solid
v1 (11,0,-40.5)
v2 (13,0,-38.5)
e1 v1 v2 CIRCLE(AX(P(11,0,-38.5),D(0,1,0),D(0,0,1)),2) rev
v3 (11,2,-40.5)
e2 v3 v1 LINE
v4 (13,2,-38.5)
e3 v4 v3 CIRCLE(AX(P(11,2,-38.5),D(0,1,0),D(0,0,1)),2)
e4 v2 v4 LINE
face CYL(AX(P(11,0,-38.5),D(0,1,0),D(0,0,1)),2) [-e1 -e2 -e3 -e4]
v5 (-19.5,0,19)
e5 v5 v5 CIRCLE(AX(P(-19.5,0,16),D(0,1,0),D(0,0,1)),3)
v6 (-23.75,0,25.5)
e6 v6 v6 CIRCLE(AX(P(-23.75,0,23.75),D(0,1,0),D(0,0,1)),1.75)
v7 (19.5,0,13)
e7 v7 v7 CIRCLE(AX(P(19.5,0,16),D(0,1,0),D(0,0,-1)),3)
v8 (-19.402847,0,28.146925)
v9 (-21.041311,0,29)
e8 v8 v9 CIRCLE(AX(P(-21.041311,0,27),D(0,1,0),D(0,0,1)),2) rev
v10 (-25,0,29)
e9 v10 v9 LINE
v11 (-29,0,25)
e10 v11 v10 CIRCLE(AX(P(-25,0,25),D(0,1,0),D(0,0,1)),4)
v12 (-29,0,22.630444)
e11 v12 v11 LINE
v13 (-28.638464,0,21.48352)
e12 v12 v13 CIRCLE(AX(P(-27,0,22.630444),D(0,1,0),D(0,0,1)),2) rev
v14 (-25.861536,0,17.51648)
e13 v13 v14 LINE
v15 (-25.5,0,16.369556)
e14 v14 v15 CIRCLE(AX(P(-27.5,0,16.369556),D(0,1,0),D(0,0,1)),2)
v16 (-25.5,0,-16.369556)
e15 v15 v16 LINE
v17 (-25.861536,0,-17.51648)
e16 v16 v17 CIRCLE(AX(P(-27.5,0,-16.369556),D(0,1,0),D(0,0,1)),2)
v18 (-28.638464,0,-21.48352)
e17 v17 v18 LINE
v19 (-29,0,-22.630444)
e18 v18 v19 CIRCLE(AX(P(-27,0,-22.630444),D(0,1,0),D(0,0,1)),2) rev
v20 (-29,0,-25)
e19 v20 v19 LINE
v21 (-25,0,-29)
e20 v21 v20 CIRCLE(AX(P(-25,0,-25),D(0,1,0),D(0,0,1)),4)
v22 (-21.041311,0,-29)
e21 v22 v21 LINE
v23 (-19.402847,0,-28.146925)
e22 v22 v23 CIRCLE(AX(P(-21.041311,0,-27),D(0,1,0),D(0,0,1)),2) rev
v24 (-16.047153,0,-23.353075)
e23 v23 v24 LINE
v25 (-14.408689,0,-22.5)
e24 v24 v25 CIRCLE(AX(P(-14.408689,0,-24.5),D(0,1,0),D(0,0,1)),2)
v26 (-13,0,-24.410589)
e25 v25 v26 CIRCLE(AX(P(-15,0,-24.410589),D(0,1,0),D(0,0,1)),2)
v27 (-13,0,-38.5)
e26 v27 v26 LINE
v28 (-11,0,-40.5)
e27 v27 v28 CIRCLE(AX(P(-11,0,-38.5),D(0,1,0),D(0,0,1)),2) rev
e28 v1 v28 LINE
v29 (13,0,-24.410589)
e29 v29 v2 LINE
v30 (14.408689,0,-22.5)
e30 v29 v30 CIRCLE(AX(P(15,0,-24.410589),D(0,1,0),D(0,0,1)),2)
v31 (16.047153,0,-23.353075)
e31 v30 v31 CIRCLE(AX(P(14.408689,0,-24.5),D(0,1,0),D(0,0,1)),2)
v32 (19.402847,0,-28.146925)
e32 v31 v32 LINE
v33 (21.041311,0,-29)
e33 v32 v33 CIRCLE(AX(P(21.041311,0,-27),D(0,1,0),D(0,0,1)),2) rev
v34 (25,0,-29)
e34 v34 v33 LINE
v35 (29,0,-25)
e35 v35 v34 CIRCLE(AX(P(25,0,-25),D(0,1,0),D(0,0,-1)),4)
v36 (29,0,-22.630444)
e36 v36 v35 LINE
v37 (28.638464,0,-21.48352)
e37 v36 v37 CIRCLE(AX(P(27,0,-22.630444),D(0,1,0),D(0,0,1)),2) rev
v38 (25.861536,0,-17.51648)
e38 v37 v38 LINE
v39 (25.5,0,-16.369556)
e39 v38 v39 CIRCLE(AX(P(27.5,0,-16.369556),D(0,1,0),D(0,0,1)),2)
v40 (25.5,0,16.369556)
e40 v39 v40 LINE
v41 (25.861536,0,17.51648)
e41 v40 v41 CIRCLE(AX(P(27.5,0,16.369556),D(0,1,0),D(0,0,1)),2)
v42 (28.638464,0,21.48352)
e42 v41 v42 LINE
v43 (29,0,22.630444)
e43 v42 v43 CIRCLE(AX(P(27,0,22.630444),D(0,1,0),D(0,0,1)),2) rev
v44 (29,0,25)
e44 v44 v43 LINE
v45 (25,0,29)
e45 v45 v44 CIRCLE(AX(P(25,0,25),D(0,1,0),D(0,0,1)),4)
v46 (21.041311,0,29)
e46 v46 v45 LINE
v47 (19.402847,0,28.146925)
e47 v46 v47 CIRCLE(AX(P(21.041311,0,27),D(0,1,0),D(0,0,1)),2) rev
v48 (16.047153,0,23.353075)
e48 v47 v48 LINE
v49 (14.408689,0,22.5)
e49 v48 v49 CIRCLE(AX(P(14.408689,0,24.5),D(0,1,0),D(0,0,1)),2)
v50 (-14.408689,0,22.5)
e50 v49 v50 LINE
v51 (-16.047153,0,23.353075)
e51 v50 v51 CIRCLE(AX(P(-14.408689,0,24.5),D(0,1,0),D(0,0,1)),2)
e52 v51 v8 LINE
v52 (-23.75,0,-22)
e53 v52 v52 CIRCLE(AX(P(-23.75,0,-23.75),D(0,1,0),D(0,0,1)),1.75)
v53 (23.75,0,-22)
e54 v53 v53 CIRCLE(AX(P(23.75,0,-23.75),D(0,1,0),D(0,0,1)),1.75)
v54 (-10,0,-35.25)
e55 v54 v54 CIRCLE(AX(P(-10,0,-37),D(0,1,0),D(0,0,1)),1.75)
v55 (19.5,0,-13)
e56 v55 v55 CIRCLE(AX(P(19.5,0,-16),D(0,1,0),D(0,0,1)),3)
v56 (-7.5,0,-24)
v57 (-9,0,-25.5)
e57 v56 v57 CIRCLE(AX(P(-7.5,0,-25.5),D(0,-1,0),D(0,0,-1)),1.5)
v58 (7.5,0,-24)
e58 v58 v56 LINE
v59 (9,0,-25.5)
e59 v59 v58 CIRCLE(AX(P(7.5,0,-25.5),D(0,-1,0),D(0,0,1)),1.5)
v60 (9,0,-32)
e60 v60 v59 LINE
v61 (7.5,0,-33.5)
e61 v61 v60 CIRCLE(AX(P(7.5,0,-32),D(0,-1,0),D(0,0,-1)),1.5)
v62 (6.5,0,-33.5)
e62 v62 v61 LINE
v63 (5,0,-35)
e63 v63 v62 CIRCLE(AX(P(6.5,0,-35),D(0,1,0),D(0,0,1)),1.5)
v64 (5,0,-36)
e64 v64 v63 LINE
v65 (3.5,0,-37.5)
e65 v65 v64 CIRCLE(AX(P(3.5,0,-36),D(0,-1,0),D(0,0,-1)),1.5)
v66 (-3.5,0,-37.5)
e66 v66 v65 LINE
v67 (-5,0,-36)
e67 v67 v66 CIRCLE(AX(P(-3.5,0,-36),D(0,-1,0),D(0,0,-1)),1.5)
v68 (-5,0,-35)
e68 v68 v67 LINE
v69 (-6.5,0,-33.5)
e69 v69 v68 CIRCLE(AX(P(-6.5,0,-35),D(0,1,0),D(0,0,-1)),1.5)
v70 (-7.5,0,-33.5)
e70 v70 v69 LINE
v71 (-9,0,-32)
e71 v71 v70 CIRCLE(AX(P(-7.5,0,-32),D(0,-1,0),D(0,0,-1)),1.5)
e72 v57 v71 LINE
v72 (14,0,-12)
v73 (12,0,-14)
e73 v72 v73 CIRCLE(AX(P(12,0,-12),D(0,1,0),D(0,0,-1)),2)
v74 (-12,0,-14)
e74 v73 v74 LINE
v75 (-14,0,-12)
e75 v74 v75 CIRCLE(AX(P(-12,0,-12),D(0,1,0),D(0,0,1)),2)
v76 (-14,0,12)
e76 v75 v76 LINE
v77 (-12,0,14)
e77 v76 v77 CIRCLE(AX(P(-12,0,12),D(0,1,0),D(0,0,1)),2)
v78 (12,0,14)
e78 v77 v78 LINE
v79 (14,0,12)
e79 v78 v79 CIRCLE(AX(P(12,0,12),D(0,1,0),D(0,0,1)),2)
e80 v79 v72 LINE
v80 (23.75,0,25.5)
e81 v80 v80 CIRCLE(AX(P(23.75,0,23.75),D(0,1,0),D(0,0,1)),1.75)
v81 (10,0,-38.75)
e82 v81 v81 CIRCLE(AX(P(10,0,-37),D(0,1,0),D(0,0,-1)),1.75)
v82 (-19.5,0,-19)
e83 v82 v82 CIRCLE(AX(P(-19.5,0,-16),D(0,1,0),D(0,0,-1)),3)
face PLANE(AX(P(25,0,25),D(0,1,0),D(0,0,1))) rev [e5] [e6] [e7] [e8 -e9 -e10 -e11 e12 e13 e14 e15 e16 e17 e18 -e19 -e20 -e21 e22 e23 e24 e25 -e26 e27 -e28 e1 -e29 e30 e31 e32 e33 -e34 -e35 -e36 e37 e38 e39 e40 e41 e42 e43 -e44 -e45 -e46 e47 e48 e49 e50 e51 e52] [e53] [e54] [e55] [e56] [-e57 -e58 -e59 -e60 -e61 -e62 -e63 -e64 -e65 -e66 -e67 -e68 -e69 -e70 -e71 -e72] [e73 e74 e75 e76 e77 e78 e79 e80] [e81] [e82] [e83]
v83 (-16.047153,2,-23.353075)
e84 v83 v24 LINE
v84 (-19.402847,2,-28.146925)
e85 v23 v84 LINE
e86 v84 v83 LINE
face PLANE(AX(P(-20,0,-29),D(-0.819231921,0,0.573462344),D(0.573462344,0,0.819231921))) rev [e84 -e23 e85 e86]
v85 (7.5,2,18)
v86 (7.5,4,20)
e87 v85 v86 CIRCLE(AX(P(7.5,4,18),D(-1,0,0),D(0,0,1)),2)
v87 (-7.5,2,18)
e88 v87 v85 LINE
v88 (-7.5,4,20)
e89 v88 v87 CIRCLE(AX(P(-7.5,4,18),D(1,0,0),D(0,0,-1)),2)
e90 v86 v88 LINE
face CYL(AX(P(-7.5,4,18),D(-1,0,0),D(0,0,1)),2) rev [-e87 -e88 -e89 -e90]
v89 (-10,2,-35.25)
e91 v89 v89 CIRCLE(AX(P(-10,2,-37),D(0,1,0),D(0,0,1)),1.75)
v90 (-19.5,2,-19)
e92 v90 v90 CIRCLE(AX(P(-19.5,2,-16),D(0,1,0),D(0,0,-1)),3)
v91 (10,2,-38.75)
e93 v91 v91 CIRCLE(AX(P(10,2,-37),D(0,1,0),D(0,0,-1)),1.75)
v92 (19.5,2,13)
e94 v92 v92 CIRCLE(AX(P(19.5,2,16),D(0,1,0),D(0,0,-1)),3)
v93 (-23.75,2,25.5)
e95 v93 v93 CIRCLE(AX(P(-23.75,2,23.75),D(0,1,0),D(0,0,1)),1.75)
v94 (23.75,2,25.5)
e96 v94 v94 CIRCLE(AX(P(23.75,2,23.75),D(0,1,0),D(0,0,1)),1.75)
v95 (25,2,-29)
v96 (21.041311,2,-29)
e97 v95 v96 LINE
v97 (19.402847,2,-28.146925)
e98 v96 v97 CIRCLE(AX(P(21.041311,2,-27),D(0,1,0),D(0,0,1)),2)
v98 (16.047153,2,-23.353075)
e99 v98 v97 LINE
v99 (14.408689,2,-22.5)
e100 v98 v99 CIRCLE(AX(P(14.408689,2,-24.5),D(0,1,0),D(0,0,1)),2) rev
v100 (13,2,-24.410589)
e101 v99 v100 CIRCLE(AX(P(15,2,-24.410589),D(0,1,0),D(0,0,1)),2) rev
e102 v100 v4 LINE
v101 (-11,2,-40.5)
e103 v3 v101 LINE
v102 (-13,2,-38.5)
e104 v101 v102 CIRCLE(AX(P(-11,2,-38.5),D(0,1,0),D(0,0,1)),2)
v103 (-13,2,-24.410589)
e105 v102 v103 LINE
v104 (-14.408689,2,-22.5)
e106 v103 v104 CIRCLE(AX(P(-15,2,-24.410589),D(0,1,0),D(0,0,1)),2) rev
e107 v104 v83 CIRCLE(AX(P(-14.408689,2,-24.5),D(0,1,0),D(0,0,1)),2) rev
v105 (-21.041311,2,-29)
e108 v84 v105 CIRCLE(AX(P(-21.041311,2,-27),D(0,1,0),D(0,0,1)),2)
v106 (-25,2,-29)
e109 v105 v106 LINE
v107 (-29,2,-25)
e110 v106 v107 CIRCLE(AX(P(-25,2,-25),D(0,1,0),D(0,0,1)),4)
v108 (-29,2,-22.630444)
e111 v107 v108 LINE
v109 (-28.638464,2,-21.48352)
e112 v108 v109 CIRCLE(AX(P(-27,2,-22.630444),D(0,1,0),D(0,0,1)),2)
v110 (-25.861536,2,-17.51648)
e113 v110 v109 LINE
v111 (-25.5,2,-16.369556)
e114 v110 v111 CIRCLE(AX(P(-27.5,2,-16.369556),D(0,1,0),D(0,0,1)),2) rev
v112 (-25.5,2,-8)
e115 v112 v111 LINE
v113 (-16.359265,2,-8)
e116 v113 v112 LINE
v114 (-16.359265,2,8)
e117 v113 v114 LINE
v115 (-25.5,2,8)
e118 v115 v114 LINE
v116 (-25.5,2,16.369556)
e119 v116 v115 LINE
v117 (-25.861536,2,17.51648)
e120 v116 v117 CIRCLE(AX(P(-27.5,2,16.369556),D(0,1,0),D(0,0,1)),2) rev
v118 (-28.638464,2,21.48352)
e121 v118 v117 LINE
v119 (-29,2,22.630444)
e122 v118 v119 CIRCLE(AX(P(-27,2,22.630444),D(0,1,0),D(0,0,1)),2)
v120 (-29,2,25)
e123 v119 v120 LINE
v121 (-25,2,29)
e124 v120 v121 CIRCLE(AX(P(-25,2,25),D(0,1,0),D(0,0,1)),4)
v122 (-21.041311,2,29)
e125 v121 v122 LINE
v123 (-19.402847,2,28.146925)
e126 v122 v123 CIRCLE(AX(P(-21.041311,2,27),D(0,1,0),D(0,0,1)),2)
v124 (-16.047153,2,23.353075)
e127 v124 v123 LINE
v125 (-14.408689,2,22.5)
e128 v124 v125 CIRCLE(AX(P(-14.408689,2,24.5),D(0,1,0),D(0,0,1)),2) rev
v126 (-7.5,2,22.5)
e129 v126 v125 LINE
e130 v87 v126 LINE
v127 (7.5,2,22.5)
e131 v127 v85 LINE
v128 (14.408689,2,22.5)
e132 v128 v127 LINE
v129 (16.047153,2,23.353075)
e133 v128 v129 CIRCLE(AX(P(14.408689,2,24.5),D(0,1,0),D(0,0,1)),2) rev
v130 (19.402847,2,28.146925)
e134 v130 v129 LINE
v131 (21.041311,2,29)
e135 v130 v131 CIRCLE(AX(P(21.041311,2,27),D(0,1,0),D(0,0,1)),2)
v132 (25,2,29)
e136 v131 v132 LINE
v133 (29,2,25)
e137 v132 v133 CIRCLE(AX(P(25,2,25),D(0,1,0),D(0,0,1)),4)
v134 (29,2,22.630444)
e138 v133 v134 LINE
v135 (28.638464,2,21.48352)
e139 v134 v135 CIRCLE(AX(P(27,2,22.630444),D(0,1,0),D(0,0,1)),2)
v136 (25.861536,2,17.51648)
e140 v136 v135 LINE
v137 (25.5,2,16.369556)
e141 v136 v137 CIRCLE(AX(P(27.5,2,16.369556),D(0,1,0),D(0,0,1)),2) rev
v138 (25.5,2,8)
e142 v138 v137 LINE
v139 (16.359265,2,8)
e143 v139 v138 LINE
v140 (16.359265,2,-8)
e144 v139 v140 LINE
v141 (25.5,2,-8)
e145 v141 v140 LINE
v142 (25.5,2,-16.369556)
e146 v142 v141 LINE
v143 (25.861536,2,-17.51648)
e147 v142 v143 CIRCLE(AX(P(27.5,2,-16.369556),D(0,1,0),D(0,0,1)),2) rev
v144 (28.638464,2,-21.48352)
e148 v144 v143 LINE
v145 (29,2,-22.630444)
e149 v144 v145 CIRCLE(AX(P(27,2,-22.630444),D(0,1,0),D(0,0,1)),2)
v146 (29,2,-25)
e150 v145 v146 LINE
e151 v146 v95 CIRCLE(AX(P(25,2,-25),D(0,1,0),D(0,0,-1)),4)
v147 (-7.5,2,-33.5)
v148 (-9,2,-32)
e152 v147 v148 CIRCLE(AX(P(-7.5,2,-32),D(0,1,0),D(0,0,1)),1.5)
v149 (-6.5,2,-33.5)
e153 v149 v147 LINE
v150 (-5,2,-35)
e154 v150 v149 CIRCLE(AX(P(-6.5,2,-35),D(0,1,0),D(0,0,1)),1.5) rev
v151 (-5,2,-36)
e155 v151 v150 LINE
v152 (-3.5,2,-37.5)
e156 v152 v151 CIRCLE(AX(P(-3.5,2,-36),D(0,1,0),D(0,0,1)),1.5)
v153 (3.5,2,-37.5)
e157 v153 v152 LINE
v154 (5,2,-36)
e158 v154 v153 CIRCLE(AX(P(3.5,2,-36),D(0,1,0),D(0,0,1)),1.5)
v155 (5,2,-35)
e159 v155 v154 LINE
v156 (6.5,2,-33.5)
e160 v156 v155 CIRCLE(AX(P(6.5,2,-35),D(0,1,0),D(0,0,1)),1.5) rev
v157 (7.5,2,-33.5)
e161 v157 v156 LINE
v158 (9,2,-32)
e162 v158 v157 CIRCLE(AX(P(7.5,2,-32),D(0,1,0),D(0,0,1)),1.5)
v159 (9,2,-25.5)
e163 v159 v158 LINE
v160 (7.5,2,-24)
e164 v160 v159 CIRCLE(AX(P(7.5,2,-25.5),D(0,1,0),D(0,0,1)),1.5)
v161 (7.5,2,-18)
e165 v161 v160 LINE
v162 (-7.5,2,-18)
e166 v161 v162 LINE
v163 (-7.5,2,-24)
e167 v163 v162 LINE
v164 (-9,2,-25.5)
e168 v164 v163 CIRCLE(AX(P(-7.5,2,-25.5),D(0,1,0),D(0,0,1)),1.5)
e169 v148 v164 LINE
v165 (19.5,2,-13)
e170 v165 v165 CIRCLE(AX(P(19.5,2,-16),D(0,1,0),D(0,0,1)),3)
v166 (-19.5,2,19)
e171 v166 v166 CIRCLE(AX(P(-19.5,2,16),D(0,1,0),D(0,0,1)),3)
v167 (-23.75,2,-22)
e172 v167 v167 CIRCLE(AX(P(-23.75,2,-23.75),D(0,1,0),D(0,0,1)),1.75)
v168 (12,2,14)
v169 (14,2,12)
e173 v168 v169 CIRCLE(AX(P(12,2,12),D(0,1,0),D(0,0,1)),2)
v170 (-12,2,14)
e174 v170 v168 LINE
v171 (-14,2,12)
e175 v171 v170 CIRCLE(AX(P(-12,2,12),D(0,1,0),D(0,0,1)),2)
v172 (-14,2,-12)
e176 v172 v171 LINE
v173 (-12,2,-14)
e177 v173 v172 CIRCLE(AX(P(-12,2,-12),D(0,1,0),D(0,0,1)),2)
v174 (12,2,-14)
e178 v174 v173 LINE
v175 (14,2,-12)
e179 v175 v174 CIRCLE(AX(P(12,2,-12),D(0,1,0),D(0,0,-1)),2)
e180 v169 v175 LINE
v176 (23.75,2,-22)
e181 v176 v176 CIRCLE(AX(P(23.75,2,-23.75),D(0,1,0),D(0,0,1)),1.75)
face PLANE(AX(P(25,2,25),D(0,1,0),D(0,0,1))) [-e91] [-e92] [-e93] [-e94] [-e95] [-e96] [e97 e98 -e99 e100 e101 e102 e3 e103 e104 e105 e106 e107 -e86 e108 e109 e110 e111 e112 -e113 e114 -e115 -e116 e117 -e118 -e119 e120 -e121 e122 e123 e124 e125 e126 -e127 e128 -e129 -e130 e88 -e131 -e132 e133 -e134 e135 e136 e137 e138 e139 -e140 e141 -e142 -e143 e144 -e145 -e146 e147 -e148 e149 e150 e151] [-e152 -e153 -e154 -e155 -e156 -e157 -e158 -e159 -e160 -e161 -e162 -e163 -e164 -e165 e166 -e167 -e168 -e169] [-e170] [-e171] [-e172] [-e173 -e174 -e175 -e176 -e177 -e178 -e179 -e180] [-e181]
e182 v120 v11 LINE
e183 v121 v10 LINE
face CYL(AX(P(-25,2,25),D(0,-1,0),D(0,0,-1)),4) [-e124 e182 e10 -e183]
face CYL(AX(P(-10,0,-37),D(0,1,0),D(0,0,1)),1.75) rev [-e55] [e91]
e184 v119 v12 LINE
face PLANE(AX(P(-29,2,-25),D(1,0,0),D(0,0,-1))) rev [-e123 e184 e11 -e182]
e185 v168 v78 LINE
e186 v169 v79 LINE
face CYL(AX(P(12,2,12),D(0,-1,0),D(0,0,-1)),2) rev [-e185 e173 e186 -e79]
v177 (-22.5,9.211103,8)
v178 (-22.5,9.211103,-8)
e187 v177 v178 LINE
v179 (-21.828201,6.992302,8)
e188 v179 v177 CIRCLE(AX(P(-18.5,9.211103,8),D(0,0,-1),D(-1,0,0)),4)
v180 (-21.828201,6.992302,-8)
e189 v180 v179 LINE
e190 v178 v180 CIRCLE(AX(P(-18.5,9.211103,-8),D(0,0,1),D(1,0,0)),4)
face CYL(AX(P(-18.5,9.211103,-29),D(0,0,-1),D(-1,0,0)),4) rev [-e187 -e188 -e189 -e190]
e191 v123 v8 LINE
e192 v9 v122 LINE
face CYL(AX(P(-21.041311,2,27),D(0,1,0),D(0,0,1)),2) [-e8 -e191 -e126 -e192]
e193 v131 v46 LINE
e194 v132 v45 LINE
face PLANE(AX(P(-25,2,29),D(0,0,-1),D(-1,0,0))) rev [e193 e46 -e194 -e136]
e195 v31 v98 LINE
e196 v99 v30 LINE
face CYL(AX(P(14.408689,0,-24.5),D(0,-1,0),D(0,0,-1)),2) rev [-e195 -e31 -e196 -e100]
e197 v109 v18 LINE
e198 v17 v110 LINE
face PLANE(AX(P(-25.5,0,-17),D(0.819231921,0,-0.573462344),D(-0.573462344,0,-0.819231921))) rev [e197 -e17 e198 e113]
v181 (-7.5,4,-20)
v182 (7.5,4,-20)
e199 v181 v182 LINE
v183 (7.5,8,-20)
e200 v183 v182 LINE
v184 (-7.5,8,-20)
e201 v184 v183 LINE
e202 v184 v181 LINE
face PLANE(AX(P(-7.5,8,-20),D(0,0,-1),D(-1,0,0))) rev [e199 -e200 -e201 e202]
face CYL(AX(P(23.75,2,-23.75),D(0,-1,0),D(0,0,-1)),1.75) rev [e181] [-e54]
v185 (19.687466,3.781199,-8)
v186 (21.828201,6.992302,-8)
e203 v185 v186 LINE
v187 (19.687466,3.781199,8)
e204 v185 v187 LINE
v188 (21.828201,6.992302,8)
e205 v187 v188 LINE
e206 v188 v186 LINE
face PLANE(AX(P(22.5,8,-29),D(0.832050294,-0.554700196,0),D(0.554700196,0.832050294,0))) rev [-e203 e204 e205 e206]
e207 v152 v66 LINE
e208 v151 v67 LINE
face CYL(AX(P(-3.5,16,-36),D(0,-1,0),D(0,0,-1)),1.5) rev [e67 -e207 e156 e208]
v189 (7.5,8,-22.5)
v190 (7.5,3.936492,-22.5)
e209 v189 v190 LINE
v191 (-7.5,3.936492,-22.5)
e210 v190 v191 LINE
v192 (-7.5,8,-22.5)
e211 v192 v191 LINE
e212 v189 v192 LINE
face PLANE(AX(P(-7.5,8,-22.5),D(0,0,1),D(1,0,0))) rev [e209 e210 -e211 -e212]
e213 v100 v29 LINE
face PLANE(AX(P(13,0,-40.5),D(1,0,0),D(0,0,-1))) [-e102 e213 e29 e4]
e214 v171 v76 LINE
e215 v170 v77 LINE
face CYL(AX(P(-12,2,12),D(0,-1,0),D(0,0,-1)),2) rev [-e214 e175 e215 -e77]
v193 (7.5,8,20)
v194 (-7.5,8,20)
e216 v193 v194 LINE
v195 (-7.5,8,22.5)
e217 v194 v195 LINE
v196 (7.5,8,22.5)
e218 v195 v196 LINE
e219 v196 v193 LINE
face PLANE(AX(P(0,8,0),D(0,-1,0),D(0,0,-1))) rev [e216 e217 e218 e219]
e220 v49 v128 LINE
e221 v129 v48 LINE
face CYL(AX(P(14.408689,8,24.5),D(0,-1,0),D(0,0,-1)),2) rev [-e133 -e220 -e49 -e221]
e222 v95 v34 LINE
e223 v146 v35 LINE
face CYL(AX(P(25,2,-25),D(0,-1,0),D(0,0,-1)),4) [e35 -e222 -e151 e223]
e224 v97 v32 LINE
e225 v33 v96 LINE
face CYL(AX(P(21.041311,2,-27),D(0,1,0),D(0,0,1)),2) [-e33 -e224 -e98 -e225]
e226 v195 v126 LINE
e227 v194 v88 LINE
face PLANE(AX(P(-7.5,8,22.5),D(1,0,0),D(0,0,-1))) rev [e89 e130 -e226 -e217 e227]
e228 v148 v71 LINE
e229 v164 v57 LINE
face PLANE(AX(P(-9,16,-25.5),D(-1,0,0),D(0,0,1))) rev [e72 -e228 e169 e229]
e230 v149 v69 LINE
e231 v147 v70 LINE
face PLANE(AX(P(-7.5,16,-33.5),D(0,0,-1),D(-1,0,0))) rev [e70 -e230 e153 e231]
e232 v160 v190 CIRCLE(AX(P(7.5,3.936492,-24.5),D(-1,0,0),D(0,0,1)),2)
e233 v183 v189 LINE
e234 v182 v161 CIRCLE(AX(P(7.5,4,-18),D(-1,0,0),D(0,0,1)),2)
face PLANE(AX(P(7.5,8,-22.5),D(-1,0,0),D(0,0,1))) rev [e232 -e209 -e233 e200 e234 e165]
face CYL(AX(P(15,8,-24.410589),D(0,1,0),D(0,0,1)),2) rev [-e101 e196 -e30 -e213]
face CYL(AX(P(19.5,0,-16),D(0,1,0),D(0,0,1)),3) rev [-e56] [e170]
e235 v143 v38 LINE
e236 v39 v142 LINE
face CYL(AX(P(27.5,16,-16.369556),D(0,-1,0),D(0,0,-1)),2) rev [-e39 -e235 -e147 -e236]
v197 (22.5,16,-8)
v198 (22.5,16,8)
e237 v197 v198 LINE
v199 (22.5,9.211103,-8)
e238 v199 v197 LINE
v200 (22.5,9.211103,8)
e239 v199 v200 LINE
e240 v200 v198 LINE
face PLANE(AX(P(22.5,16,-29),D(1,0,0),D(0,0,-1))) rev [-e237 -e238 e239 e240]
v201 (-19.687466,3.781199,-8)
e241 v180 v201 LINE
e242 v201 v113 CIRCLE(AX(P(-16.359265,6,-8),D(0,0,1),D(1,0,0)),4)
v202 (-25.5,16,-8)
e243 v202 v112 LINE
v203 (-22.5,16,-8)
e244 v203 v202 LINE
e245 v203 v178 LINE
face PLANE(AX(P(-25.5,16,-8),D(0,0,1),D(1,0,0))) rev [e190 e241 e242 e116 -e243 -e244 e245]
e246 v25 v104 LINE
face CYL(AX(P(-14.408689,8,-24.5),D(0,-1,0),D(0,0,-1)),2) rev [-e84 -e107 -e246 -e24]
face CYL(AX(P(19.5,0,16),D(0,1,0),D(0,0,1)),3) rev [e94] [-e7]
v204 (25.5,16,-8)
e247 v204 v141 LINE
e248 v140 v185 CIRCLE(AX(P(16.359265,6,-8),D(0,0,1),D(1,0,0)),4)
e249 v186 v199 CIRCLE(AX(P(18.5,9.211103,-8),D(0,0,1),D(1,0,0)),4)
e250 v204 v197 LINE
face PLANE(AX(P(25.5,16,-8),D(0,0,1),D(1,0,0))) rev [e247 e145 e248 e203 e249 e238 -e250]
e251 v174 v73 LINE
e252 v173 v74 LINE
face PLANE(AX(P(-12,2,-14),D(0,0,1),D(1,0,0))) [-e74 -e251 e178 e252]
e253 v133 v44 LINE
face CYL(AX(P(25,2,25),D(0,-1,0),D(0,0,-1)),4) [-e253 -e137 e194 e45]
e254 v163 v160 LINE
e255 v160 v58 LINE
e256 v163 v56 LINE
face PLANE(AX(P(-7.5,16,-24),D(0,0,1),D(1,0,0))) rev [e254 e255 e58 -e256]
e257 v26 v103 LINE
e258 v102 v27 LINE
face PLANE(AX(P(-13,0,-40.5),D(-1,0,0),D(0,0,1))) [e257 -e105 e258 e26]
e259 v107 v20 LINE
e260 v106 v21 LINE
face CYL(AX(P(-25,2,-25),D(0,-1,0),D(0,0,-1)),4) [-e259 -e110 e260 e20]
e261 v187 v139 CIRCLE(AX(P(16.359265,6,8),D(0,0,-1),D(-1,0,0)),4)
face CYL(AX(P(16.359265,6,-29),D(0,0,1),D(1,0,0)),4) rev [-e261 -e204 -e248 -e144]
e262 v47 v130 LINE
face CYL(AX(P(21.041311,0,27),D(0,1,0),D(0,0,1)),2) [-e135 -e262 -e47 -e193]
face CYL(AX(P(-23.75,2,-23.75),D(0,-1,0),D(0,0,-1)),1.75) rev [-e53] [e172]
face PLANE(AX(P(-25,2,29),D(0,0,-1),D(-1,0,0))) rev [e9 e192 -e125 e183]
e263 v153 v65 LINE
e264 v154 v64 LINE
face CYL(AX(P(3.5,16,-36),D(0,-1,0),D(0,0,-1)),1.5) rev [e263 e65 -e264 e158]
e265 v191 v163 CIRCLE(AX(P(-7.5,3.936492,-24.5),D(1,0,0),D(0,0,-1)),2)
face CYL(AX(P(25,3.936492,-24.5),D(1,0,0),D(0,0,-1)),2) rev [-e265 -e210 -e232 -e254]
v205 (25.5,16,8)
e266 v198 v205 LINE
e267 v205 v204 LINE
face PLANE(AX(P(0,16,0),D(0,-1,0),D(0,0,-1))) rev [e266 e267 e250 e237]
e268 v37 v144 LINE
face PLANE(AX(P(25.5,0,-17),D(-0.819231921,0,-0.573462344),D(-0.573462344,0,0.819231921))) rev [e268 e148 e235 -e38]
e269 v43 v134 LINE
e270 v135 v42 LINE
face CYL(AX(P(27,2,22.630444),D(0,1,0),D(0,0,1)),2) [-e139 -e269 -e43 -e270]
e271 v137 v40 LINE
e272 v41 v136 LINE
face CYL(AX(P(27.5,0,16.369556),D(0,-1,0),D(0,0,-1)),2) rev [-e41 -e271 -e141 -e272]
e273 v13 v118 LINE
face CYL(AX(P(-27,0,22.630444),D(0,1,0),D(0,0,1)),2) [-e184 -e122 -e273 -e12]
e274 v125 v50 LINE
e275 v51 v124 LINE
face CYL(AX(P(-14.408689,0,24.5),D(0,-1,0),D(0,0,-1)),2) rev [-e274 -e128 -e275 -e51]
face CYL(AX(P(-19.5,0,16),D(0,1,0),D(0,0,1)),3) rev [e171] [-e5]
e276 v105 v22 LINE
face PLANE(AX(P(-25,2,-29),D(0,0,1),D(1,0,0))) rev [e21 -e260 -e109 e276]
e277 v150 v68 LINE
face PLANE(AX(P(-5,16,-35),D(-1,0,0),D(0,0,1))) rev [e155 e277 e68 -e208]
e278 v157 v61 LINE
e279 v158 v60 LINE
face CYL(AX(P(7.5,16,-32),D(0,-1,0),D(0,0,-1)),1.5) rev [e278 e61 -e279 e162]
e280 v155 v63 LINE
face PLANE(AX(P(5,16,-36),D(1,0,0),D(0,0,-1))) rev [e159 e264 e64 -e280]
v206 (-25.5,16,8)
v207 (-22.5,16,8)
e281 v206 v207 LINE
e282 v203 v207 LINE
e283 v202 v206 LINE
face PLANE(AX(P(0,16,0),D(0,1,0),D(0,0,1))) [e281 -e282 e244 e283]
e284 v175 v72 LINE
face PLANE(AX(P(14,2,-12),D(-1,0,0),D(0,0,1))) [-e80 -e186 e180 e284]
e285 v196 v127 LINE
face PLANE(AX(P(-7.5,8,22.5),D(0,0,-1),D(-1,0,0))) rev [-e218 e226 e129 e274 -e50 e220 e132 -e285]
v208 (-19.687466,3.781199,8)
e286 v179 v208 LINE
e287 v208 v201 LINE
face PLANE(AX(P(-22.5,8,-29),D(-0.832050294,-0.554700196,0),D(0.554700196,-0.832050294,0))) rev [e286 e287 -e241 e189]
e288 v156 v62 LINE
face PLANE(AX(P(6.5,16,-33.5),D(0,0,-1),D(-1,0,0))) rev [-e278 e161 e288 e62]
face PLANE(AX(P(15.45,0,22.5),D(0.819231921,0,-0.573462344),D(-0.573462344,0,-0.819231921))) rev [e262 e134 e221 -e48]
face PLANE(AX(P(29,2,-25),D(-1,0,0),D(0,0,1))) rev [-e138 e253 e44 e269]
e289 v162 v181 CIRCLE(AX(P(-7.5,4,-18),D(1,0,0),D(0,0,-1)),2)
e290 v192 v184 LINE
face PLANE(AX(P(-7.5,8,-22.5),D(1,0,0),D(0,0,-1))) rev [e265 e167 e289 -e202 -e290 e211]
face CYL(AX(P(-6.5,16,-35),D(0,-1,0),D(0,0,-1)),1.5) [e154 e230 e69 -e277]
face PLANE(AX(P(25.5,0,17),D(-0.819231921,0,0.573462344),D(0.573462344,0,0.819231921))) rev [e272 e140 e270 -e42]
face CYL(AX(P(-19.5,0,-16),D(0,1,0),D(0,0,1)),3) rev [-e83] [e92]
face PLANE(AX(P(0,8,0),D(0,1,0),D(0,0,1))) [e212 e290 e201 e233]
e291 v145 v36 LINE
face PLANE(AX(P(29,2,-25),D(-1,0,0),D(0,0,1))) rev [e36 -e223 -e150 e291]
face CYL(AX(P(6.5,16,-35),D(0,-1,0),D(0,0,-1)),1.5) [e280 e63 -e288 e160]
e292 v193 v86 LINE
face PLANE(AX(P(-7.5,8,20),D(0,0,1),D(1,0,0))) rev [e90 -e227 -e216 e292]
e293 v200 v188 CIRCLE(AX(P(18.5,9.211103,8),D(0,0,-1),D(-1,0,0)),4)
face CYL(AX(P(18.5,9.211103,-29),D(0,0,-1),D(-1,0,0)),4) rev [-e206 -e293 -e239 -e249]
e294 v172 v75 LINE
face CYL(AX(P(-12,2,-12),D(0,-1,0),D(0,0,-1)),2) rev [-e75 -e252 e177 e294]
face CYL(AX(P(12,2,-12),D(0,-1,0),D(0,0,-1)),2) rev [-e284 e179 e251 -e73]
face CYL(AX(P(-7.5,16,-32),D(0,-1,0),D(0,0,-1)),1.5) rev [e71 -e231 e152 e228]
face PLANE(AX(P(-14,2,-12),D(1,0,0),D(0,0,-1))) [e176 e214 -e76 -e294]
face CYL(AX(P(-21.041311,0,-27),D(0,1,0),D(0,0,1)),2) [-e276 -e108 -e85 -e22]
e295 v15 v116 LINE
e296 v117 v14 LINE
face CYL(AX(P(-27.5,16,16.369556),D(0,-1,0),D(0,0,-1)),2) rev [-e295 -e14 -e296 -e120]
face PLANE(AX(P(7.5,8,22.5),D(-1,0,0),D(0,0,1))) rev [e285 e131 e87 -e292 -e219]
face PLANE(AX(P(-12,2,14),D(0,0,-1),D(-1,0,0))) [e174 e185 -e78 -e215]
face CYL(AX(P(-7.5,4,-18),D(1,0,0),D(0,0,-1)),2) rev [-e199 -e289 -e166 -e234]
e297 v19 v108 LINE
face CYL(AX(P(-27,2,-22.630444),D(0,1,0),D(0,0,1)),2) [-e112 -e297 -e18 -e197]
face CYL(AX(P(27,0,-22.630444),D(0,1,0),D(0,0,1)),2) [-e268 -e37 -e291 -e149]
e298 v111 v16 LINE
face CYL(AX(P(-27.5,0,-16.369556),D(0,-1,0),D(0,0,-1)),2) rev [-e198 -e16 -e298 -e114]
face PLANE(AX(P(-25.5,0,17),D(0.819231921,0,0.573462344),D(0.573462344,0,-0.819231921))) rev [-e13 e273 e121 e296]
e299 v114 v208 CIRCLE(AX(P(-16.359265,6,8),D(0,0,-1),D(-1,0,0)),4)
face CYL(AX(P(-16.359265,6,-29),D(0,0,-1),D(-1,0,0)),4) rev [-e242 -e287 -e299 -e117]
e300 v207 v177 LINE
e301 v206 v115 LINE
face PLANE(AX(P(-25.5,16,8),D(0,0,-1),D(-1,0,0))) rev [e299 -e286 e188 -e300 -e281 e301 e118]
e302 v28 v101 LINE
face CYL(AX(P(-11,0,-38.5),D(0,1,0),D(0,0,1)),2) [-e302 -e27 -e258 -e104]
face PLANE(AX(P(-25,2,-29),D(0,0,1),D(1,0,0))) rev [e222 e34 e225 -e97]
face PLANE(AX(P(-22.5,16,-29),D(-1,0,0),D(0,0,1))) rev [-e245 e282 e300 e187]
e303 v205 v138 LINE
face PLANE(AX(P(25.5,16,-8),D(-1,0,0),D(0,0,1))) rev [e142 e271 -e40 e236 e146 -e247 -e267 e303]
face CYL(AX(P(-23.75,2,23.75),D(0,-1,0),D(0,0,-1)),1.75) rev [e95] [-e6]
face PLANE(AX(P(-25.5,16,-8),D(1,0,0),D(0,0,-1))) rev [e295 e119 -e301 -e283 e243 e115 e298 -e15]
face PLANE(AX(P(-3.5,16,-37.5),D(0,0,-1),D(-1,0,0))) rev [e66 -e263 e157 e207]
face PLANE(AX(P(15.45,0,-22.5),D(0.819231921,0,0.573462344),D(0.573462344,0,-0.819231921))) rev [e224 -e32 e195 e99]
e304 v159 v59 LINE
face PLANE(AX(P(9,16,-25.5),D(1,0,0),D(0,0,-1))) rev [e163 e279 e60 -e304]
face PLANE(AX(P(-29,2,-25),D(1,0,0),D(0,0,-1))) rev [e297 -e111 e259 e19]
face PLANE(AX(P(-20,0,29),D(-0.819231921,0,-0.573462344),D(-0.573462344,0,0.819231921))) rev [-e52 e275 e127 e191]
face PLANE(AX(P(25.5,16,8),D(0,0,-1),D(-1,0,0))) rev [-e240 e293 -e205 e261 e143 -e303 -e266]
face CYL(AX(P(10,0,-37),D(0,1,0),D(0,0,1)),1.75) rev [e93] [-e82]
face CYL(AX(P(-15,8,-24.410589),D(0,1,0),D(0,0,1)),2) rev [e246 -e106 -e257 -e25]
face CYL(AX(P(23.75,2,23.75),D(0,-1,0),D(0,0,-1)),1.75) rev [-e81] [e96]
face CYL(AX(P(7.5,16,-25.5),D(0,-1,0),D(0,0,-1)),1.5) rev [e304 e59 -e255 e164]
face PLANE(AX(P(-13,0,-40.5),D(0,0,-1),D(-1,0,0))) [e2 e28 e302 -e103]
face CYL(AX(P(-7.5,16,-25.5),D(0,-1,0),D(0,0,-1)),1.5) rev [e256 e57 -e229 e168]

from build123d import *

# Parameters (mm, degrees)
SKETCH1_R              = 1.75
BOSS_EXTRUDE1_DEPTH    = 2
SKETCH2_W              = 7
SKETCH2_H              = 16
BOSS_EXTRUDE2_DEPTH    = 14
CUT_EXTRUDE1_DEPTH     = 50.658836072
SKETCH5_W              = 15
SKETCH5_H              = 2.5
BOSS_EXTRUDE3_DEPTH    = 6
CUT_EXTRUDE2_DEPTH     = 44.33589736
FILLET2_R              = 2
SKETCH7_R              = 3
CUT_EXTRUDE3_DEPTH     = 44.33589736
SKETCH8_W              = 26
SKETCH8_H              = 18
SKETCH8_R              = 1.75
PINOUT_BD_HOLDER_DEPTH = 2
WEIGH_REDUCER_DEPTH    = 53.318734694
FILLET3_R              = 4
FILLET4_R              = 2
FILLET5_DEPTH          = 2
FILLET5_START          = -7.5
FILLET5_2_DEPTH        = 15
FILLET5_START_2        = -1
FILLET5_3_DEPTH        = 4


with BuildPart() as part:
    # Sketch1 → Boss-Extrude1 (new body)
    with BuildSketch(Plane(origin=(0, 0, 0), x_dir=(1, 0, 0), z_dir=(0, 1, 0))):
        with BuildLine():
            Line((-25, 29), (25, 29))
            ThreePointArc((25, 29), (27.828427125, 27.828427125), (29, 25))
            Line((29, 25), (29, -25))
            ThreePointArc((29, -25), (27.828427125, -27.828427125), (25, -29))
            Line((25, -29), (-25, -29))
            ThreePointArc((-25, -29), (-27.828427125, -27.828427125), (-29, -25))
            Line((-29, -25), (-29, 25))
            ThreePointArc((-29, 25), (-27.828427125, 27.828427125), (-25, 29))
        make_face()
        with Locations(Location((23.75, 23.75, 0), (0, 0, 270))):
            Circle(SKETCH1_R, mode=Mode.SUBTRACT)
        with Locations(Location((23.75, -23.75, 0), (0, 0, 270))):
            Circle(SKETCH1_R, mode=Mode.SUBTRACT)
        with Locations(Location((-23.75, -23.75, 0), (0, 0, 270))):
            Circle(SKETCH1_R, mode=Mode.SUBTRACT)
        with Locations(Location((-23.75, 23.75, 0), (0, 0, 270))):
            Circle(SKETCH1_R, mode=Mode.SUBTRACT)
        with BuildLine():
            Line((-12, 14), (12, 14))
            ThreePointArc((12, 14), (13.414213562, 13.414213562), (14, 12))
            Line((14, 12), (14, -12))
            ThreePointArc((14, -12), (13.414213562, -13.414213562), (12, -14))
            Line((12, -14), (-12, -14))
            ThreePointArc((-12, -14), (-13.414213562, -13.414213562), (-14, -12))
            Line((-14, -12), (-14, 12))
            ThreePointArc((-14, 12), (-13.414213562, 13.414213562), (-12, 14))
        make_face(mode=Mode.SUBTRACT)
    extrude(amount=BOSS_EXTRUDE1_DEPTH)

    # Sketch2 → Boss-Extrude2 (add)
    with BuildSketch(Plane(origin=(0, 2, 0), x_dir=(1, 0, 0), z_dir=(0, 1, 0))):
        with Locations((-22, 0)):
            Rectangle(SKETCH2_W, SKETCH2_H)
        with Locations((22, 0)):
            Rectangle(SKETCH2_W, SKETCH2_H)
    extrude(amount=BOSS_EXTRUDE2_DEPTH)

    # Sketch4 → Cut-Extrude1 (cut, through all)
    with BuildSketch(Plane.XY.offset(8)):
        Polygon((-18.5, 16), (-22.5, 16), (-22.5, 8), (-18.5, 2), align=None)
        Polygon((18.5, 2), (18.5, 16), (22.5, 16), (22.5, 8), align=None)
    extrude(amount=-CUT_EXTRUDE1_DEPTH, mode=Mode.SUBTRACT)

    # Sketch5 → Boss-Extrude3 (add)
    with BuildSketch(Plane(origin=(0, 2, 0), x_dir=(1, 0, 0), z_dir=(0, 1, 0))):
        with Locations((0, 21.25)):
            Rectangle(SKETCH5_W, SKETCH5_H)
        with Locations((0, -21.25)):
            Rectangle(SKETCH5_W, SKETCH5_H)
    extrude(amount=BOSS_EXTRUDE3_DEPTH)

    # Sketch6 → Cut-Extrude2 (cut, through all)
    with BuildSketch(Plane(origin=(0, 2, 0), x_dir=(1, 0, 0), z_dir=(0, 1, 0))):
        Polygon((-25.5, 8), (-25.5, 17), (-29, 22), (-29, -22), (-25.5, -17), (-25.5, -8), align=None)
        Polygon((-15.45, -22.5), (-7.5, -22.5), (7.5, -22.5), (15.45, -22.5), (20, -29), (-20, -29), align=None)
        Polygon((29, 22), (29, -22), (25.5, -17), (25.5, -8), (25.5, 8), (25.5, 17), align=None)
        Polygon((-7.5, 22.5), (7.5, 22.5), (15.45, 22.5), (20, 29), (-20, 29), (-15.45, 22.5), align=None)
    extrude(amount=-CUT_EXTRUDE2_DEPTH, mode=Mode.SUBTRACT)

    # Fillet2
    fillet2_edges = [part.edges().sort_by_distance(p)[0] for p in [
        (-25.5, 1, -17),
        (-25.5, 1, 17),
        (-29, 1, 22),
        (-29, 1, -22),
        (-20, 1, 29),
        (-15.45, 1, 22.5),
        (15.45, 1, 22.5),
        (20, 1, 29),
        (25.5, 1, -17),
        (29, 1, -22),
        (29, 1, 22),
        (25.5, 1, 17),
        (-15.45, 1, -22.5),
        (-20, 1, -29),
        (20, 1, -29),
        (15.45, 1, -22.5),
    ]]
    fillet(fillet2_edges, radius=FILLET2_R)

    # Sketch7 → Cut-Extrude3 (cut, through all)
    with BuildSketch(Plane(origin=(0, 2, 0), x_dir=(1, 0, 0), z_dir=(0, 1, 0))):
        with Locations(Location((19.5, 16, 0), (0, 0, 270))):
            Circle(SKETCH7_R)
        with Locations(Location((19.5, -16, 0), (0, 0, 90))):
            Circle(SKETCH7_R)
        with Locations(Location((-19.5, -16, 0), (0, 0, 270))):
            Circle(SKETCH7_R)
        with Locations(Location((-19.5, 16, 0), (0, 0, 90))):
            Circle(SKETCH7_R)
    extrude(amount=-CUT_EXTRUDE3_DEPTH, mode=Mode.SUBTRACT)

    # Sketch8 → pinout_bd_holder (add)
    with BuildSketch(Plane(origin=(0, 2, 0), x_dir=(1, 0, 0), z_dir=(0, 1, 0))):
        with Locations((0, 31.5)):
            Rectangle(SKETCH8_W, SKETCH8_H)
        with Locations(Location((-10, 37, 0), (0, 0, 270))):
            Circle(SKETCH8_R, mode=Mode.SUBTRACT)
        with Locations(Location((10, 37, 0), (0, 0, 90))):
            Circle(SKETCH8_R, mode=Mode.SUBTRACT)
    extrude(amount=-PINOUT_BD_HOLDER_DEPTH)

    # Sketch9 → Weigh-Reducer (cut, through all)
    with BuildSketch(Plane.XZ):
        with BuildLine():
            Line((-7.5, -24), (7.5, -24))
            ThreePointArc((7.5, -24), (8.560660172, -24.439339828), (9, -25.5))
            Line((9, -25.5), (9, -32))
            ThreePointArc((9, -32), (8.560660172, -33.060660172), (7.5, -33.5))
            Line((7.5, -33.5), (6.5, -33.5))
            ThreePointArc((6.5, -33.5), (5.439339828, -33.939339828), (5, -35))
            Line((5, -35), (5, -36))
            ThreePointArc((5, -36), (4.560660172, -37.060660172), (3.5, -37.5))
            Line((3.5, -37.5), (-3.5, -37.5))
            ThreePointArc((-3.5, -37.5), (-4.560660172, -37.060660172), (-5, -36))
            Line((-5, -36), (-5, -35))
            ThreePointArc((-5, -35), (-5.439339828, -33.939339828), (-6.5, -33.5))
            Line((-6.5, -33.5), (-7.5, -33.5))
            ThreePointArc((-7.5, -33.5), (-8.560660172, -33.060660172), (-9, -32))
            Line((-9, -32), (-9, -25.5))
            ThreePointArc((-9, -25.5), (-8.560660172, -24.439339828), (-7.5, -24))
        make_face()
    extrude(amount=-WEIGH_REDUCER_DEPTH, mode=Mode.SUBTRACT)

    # Fillet3
    fillet3_edges = [part.edges().sort_by_distance(p)[0] for p in [
        (22.5, 8, 0),
        (-18.5, 2, 0),
        (18.5, 2, 0),
        (-22.5, 8, 0),
    ]]
    fillet(fillet3_edges, radius=FILLET3_R)

    # Fillet4
    fillet4_edges = [part.edges().sort_by_distance(p)[0] for p in [
        (0, 2, -20),
        (0, 2, 20),
    ]]
    fillet(fillet4_edges, radius=FILLET4_R)

    # Fillet5: read off the stored shape, not the designer's step
    # Fillet5 outline → Fillet5 (add)
    with BuildSketch(Plane(origin=(0, 0, 0), x_dir=(1, 0, 0), z_dir=(0, 1, 0))):
        with BuildLine():
            Line((-13, 22.5), (-13, 24.410589217))
            ThreePointArc((-13, 24.410589217), (-13.390245011, 23.223707219), (-14.408688877, 22.5))
            Line((-14.408688877, 22.5), (-13, 22.5))
        make_face()
        with BuildLine():
            ThreePointArc((14.408688877, 22.5), (13.390245011, 23.223707219), (13, 24.410589217))
            Line((13, 24.410589217), (13, 22.5))
            Line((13, 22.5), (14.408688877, 22.5))
        make_face()
    extrude(amount=FILLET5_DEPTH)

    # Fillet5 2 outline → Fillet5 2 (add)
    with BuildSketch(Plane.YZ.offset(FILLET5_START)):
        with BuildLine():
            ThreePointArc((2, -24), (2.711746802, -22.91886117), (3.936491673, -22.5))
            Line((3.936491673, -22.5), (2, -22.5))
            Line((2, -22.5), (2, -24))
        make_face()
    extrude(amount=FILLET5_2_DEPTH)

    # Fillet5 3 outline → Fillet5 3 (cut)
    with BuildSketch(Plane(origin=(0, 0, 0), x_dir=(1, 0, 0), z_dir=(0, 1, 0)).offset(FILLET5_START_2)):
        with BuildLine():
            ThreePointArc((-13, 38.5), (-12.414213562, 39.914213562), (-11, 40.5))
            Line((-11, 40.5), (-13, 40.5))
            Line((-13, 40.5), (-13, 38.5))
        make_face()
        with BuildLine():
            ThreePointArc((11, 40.5), (12.414213562, 39.914213562), (13, 38.5))
            Line((13, 38.5), (13, 40.5))
            Line((13, 40.5), (11, 40.5))
        make_face()
    extrude(amount=FILLET5_3_DEPTH, mode=Mode.SUBTRACT)


solid = part.part
